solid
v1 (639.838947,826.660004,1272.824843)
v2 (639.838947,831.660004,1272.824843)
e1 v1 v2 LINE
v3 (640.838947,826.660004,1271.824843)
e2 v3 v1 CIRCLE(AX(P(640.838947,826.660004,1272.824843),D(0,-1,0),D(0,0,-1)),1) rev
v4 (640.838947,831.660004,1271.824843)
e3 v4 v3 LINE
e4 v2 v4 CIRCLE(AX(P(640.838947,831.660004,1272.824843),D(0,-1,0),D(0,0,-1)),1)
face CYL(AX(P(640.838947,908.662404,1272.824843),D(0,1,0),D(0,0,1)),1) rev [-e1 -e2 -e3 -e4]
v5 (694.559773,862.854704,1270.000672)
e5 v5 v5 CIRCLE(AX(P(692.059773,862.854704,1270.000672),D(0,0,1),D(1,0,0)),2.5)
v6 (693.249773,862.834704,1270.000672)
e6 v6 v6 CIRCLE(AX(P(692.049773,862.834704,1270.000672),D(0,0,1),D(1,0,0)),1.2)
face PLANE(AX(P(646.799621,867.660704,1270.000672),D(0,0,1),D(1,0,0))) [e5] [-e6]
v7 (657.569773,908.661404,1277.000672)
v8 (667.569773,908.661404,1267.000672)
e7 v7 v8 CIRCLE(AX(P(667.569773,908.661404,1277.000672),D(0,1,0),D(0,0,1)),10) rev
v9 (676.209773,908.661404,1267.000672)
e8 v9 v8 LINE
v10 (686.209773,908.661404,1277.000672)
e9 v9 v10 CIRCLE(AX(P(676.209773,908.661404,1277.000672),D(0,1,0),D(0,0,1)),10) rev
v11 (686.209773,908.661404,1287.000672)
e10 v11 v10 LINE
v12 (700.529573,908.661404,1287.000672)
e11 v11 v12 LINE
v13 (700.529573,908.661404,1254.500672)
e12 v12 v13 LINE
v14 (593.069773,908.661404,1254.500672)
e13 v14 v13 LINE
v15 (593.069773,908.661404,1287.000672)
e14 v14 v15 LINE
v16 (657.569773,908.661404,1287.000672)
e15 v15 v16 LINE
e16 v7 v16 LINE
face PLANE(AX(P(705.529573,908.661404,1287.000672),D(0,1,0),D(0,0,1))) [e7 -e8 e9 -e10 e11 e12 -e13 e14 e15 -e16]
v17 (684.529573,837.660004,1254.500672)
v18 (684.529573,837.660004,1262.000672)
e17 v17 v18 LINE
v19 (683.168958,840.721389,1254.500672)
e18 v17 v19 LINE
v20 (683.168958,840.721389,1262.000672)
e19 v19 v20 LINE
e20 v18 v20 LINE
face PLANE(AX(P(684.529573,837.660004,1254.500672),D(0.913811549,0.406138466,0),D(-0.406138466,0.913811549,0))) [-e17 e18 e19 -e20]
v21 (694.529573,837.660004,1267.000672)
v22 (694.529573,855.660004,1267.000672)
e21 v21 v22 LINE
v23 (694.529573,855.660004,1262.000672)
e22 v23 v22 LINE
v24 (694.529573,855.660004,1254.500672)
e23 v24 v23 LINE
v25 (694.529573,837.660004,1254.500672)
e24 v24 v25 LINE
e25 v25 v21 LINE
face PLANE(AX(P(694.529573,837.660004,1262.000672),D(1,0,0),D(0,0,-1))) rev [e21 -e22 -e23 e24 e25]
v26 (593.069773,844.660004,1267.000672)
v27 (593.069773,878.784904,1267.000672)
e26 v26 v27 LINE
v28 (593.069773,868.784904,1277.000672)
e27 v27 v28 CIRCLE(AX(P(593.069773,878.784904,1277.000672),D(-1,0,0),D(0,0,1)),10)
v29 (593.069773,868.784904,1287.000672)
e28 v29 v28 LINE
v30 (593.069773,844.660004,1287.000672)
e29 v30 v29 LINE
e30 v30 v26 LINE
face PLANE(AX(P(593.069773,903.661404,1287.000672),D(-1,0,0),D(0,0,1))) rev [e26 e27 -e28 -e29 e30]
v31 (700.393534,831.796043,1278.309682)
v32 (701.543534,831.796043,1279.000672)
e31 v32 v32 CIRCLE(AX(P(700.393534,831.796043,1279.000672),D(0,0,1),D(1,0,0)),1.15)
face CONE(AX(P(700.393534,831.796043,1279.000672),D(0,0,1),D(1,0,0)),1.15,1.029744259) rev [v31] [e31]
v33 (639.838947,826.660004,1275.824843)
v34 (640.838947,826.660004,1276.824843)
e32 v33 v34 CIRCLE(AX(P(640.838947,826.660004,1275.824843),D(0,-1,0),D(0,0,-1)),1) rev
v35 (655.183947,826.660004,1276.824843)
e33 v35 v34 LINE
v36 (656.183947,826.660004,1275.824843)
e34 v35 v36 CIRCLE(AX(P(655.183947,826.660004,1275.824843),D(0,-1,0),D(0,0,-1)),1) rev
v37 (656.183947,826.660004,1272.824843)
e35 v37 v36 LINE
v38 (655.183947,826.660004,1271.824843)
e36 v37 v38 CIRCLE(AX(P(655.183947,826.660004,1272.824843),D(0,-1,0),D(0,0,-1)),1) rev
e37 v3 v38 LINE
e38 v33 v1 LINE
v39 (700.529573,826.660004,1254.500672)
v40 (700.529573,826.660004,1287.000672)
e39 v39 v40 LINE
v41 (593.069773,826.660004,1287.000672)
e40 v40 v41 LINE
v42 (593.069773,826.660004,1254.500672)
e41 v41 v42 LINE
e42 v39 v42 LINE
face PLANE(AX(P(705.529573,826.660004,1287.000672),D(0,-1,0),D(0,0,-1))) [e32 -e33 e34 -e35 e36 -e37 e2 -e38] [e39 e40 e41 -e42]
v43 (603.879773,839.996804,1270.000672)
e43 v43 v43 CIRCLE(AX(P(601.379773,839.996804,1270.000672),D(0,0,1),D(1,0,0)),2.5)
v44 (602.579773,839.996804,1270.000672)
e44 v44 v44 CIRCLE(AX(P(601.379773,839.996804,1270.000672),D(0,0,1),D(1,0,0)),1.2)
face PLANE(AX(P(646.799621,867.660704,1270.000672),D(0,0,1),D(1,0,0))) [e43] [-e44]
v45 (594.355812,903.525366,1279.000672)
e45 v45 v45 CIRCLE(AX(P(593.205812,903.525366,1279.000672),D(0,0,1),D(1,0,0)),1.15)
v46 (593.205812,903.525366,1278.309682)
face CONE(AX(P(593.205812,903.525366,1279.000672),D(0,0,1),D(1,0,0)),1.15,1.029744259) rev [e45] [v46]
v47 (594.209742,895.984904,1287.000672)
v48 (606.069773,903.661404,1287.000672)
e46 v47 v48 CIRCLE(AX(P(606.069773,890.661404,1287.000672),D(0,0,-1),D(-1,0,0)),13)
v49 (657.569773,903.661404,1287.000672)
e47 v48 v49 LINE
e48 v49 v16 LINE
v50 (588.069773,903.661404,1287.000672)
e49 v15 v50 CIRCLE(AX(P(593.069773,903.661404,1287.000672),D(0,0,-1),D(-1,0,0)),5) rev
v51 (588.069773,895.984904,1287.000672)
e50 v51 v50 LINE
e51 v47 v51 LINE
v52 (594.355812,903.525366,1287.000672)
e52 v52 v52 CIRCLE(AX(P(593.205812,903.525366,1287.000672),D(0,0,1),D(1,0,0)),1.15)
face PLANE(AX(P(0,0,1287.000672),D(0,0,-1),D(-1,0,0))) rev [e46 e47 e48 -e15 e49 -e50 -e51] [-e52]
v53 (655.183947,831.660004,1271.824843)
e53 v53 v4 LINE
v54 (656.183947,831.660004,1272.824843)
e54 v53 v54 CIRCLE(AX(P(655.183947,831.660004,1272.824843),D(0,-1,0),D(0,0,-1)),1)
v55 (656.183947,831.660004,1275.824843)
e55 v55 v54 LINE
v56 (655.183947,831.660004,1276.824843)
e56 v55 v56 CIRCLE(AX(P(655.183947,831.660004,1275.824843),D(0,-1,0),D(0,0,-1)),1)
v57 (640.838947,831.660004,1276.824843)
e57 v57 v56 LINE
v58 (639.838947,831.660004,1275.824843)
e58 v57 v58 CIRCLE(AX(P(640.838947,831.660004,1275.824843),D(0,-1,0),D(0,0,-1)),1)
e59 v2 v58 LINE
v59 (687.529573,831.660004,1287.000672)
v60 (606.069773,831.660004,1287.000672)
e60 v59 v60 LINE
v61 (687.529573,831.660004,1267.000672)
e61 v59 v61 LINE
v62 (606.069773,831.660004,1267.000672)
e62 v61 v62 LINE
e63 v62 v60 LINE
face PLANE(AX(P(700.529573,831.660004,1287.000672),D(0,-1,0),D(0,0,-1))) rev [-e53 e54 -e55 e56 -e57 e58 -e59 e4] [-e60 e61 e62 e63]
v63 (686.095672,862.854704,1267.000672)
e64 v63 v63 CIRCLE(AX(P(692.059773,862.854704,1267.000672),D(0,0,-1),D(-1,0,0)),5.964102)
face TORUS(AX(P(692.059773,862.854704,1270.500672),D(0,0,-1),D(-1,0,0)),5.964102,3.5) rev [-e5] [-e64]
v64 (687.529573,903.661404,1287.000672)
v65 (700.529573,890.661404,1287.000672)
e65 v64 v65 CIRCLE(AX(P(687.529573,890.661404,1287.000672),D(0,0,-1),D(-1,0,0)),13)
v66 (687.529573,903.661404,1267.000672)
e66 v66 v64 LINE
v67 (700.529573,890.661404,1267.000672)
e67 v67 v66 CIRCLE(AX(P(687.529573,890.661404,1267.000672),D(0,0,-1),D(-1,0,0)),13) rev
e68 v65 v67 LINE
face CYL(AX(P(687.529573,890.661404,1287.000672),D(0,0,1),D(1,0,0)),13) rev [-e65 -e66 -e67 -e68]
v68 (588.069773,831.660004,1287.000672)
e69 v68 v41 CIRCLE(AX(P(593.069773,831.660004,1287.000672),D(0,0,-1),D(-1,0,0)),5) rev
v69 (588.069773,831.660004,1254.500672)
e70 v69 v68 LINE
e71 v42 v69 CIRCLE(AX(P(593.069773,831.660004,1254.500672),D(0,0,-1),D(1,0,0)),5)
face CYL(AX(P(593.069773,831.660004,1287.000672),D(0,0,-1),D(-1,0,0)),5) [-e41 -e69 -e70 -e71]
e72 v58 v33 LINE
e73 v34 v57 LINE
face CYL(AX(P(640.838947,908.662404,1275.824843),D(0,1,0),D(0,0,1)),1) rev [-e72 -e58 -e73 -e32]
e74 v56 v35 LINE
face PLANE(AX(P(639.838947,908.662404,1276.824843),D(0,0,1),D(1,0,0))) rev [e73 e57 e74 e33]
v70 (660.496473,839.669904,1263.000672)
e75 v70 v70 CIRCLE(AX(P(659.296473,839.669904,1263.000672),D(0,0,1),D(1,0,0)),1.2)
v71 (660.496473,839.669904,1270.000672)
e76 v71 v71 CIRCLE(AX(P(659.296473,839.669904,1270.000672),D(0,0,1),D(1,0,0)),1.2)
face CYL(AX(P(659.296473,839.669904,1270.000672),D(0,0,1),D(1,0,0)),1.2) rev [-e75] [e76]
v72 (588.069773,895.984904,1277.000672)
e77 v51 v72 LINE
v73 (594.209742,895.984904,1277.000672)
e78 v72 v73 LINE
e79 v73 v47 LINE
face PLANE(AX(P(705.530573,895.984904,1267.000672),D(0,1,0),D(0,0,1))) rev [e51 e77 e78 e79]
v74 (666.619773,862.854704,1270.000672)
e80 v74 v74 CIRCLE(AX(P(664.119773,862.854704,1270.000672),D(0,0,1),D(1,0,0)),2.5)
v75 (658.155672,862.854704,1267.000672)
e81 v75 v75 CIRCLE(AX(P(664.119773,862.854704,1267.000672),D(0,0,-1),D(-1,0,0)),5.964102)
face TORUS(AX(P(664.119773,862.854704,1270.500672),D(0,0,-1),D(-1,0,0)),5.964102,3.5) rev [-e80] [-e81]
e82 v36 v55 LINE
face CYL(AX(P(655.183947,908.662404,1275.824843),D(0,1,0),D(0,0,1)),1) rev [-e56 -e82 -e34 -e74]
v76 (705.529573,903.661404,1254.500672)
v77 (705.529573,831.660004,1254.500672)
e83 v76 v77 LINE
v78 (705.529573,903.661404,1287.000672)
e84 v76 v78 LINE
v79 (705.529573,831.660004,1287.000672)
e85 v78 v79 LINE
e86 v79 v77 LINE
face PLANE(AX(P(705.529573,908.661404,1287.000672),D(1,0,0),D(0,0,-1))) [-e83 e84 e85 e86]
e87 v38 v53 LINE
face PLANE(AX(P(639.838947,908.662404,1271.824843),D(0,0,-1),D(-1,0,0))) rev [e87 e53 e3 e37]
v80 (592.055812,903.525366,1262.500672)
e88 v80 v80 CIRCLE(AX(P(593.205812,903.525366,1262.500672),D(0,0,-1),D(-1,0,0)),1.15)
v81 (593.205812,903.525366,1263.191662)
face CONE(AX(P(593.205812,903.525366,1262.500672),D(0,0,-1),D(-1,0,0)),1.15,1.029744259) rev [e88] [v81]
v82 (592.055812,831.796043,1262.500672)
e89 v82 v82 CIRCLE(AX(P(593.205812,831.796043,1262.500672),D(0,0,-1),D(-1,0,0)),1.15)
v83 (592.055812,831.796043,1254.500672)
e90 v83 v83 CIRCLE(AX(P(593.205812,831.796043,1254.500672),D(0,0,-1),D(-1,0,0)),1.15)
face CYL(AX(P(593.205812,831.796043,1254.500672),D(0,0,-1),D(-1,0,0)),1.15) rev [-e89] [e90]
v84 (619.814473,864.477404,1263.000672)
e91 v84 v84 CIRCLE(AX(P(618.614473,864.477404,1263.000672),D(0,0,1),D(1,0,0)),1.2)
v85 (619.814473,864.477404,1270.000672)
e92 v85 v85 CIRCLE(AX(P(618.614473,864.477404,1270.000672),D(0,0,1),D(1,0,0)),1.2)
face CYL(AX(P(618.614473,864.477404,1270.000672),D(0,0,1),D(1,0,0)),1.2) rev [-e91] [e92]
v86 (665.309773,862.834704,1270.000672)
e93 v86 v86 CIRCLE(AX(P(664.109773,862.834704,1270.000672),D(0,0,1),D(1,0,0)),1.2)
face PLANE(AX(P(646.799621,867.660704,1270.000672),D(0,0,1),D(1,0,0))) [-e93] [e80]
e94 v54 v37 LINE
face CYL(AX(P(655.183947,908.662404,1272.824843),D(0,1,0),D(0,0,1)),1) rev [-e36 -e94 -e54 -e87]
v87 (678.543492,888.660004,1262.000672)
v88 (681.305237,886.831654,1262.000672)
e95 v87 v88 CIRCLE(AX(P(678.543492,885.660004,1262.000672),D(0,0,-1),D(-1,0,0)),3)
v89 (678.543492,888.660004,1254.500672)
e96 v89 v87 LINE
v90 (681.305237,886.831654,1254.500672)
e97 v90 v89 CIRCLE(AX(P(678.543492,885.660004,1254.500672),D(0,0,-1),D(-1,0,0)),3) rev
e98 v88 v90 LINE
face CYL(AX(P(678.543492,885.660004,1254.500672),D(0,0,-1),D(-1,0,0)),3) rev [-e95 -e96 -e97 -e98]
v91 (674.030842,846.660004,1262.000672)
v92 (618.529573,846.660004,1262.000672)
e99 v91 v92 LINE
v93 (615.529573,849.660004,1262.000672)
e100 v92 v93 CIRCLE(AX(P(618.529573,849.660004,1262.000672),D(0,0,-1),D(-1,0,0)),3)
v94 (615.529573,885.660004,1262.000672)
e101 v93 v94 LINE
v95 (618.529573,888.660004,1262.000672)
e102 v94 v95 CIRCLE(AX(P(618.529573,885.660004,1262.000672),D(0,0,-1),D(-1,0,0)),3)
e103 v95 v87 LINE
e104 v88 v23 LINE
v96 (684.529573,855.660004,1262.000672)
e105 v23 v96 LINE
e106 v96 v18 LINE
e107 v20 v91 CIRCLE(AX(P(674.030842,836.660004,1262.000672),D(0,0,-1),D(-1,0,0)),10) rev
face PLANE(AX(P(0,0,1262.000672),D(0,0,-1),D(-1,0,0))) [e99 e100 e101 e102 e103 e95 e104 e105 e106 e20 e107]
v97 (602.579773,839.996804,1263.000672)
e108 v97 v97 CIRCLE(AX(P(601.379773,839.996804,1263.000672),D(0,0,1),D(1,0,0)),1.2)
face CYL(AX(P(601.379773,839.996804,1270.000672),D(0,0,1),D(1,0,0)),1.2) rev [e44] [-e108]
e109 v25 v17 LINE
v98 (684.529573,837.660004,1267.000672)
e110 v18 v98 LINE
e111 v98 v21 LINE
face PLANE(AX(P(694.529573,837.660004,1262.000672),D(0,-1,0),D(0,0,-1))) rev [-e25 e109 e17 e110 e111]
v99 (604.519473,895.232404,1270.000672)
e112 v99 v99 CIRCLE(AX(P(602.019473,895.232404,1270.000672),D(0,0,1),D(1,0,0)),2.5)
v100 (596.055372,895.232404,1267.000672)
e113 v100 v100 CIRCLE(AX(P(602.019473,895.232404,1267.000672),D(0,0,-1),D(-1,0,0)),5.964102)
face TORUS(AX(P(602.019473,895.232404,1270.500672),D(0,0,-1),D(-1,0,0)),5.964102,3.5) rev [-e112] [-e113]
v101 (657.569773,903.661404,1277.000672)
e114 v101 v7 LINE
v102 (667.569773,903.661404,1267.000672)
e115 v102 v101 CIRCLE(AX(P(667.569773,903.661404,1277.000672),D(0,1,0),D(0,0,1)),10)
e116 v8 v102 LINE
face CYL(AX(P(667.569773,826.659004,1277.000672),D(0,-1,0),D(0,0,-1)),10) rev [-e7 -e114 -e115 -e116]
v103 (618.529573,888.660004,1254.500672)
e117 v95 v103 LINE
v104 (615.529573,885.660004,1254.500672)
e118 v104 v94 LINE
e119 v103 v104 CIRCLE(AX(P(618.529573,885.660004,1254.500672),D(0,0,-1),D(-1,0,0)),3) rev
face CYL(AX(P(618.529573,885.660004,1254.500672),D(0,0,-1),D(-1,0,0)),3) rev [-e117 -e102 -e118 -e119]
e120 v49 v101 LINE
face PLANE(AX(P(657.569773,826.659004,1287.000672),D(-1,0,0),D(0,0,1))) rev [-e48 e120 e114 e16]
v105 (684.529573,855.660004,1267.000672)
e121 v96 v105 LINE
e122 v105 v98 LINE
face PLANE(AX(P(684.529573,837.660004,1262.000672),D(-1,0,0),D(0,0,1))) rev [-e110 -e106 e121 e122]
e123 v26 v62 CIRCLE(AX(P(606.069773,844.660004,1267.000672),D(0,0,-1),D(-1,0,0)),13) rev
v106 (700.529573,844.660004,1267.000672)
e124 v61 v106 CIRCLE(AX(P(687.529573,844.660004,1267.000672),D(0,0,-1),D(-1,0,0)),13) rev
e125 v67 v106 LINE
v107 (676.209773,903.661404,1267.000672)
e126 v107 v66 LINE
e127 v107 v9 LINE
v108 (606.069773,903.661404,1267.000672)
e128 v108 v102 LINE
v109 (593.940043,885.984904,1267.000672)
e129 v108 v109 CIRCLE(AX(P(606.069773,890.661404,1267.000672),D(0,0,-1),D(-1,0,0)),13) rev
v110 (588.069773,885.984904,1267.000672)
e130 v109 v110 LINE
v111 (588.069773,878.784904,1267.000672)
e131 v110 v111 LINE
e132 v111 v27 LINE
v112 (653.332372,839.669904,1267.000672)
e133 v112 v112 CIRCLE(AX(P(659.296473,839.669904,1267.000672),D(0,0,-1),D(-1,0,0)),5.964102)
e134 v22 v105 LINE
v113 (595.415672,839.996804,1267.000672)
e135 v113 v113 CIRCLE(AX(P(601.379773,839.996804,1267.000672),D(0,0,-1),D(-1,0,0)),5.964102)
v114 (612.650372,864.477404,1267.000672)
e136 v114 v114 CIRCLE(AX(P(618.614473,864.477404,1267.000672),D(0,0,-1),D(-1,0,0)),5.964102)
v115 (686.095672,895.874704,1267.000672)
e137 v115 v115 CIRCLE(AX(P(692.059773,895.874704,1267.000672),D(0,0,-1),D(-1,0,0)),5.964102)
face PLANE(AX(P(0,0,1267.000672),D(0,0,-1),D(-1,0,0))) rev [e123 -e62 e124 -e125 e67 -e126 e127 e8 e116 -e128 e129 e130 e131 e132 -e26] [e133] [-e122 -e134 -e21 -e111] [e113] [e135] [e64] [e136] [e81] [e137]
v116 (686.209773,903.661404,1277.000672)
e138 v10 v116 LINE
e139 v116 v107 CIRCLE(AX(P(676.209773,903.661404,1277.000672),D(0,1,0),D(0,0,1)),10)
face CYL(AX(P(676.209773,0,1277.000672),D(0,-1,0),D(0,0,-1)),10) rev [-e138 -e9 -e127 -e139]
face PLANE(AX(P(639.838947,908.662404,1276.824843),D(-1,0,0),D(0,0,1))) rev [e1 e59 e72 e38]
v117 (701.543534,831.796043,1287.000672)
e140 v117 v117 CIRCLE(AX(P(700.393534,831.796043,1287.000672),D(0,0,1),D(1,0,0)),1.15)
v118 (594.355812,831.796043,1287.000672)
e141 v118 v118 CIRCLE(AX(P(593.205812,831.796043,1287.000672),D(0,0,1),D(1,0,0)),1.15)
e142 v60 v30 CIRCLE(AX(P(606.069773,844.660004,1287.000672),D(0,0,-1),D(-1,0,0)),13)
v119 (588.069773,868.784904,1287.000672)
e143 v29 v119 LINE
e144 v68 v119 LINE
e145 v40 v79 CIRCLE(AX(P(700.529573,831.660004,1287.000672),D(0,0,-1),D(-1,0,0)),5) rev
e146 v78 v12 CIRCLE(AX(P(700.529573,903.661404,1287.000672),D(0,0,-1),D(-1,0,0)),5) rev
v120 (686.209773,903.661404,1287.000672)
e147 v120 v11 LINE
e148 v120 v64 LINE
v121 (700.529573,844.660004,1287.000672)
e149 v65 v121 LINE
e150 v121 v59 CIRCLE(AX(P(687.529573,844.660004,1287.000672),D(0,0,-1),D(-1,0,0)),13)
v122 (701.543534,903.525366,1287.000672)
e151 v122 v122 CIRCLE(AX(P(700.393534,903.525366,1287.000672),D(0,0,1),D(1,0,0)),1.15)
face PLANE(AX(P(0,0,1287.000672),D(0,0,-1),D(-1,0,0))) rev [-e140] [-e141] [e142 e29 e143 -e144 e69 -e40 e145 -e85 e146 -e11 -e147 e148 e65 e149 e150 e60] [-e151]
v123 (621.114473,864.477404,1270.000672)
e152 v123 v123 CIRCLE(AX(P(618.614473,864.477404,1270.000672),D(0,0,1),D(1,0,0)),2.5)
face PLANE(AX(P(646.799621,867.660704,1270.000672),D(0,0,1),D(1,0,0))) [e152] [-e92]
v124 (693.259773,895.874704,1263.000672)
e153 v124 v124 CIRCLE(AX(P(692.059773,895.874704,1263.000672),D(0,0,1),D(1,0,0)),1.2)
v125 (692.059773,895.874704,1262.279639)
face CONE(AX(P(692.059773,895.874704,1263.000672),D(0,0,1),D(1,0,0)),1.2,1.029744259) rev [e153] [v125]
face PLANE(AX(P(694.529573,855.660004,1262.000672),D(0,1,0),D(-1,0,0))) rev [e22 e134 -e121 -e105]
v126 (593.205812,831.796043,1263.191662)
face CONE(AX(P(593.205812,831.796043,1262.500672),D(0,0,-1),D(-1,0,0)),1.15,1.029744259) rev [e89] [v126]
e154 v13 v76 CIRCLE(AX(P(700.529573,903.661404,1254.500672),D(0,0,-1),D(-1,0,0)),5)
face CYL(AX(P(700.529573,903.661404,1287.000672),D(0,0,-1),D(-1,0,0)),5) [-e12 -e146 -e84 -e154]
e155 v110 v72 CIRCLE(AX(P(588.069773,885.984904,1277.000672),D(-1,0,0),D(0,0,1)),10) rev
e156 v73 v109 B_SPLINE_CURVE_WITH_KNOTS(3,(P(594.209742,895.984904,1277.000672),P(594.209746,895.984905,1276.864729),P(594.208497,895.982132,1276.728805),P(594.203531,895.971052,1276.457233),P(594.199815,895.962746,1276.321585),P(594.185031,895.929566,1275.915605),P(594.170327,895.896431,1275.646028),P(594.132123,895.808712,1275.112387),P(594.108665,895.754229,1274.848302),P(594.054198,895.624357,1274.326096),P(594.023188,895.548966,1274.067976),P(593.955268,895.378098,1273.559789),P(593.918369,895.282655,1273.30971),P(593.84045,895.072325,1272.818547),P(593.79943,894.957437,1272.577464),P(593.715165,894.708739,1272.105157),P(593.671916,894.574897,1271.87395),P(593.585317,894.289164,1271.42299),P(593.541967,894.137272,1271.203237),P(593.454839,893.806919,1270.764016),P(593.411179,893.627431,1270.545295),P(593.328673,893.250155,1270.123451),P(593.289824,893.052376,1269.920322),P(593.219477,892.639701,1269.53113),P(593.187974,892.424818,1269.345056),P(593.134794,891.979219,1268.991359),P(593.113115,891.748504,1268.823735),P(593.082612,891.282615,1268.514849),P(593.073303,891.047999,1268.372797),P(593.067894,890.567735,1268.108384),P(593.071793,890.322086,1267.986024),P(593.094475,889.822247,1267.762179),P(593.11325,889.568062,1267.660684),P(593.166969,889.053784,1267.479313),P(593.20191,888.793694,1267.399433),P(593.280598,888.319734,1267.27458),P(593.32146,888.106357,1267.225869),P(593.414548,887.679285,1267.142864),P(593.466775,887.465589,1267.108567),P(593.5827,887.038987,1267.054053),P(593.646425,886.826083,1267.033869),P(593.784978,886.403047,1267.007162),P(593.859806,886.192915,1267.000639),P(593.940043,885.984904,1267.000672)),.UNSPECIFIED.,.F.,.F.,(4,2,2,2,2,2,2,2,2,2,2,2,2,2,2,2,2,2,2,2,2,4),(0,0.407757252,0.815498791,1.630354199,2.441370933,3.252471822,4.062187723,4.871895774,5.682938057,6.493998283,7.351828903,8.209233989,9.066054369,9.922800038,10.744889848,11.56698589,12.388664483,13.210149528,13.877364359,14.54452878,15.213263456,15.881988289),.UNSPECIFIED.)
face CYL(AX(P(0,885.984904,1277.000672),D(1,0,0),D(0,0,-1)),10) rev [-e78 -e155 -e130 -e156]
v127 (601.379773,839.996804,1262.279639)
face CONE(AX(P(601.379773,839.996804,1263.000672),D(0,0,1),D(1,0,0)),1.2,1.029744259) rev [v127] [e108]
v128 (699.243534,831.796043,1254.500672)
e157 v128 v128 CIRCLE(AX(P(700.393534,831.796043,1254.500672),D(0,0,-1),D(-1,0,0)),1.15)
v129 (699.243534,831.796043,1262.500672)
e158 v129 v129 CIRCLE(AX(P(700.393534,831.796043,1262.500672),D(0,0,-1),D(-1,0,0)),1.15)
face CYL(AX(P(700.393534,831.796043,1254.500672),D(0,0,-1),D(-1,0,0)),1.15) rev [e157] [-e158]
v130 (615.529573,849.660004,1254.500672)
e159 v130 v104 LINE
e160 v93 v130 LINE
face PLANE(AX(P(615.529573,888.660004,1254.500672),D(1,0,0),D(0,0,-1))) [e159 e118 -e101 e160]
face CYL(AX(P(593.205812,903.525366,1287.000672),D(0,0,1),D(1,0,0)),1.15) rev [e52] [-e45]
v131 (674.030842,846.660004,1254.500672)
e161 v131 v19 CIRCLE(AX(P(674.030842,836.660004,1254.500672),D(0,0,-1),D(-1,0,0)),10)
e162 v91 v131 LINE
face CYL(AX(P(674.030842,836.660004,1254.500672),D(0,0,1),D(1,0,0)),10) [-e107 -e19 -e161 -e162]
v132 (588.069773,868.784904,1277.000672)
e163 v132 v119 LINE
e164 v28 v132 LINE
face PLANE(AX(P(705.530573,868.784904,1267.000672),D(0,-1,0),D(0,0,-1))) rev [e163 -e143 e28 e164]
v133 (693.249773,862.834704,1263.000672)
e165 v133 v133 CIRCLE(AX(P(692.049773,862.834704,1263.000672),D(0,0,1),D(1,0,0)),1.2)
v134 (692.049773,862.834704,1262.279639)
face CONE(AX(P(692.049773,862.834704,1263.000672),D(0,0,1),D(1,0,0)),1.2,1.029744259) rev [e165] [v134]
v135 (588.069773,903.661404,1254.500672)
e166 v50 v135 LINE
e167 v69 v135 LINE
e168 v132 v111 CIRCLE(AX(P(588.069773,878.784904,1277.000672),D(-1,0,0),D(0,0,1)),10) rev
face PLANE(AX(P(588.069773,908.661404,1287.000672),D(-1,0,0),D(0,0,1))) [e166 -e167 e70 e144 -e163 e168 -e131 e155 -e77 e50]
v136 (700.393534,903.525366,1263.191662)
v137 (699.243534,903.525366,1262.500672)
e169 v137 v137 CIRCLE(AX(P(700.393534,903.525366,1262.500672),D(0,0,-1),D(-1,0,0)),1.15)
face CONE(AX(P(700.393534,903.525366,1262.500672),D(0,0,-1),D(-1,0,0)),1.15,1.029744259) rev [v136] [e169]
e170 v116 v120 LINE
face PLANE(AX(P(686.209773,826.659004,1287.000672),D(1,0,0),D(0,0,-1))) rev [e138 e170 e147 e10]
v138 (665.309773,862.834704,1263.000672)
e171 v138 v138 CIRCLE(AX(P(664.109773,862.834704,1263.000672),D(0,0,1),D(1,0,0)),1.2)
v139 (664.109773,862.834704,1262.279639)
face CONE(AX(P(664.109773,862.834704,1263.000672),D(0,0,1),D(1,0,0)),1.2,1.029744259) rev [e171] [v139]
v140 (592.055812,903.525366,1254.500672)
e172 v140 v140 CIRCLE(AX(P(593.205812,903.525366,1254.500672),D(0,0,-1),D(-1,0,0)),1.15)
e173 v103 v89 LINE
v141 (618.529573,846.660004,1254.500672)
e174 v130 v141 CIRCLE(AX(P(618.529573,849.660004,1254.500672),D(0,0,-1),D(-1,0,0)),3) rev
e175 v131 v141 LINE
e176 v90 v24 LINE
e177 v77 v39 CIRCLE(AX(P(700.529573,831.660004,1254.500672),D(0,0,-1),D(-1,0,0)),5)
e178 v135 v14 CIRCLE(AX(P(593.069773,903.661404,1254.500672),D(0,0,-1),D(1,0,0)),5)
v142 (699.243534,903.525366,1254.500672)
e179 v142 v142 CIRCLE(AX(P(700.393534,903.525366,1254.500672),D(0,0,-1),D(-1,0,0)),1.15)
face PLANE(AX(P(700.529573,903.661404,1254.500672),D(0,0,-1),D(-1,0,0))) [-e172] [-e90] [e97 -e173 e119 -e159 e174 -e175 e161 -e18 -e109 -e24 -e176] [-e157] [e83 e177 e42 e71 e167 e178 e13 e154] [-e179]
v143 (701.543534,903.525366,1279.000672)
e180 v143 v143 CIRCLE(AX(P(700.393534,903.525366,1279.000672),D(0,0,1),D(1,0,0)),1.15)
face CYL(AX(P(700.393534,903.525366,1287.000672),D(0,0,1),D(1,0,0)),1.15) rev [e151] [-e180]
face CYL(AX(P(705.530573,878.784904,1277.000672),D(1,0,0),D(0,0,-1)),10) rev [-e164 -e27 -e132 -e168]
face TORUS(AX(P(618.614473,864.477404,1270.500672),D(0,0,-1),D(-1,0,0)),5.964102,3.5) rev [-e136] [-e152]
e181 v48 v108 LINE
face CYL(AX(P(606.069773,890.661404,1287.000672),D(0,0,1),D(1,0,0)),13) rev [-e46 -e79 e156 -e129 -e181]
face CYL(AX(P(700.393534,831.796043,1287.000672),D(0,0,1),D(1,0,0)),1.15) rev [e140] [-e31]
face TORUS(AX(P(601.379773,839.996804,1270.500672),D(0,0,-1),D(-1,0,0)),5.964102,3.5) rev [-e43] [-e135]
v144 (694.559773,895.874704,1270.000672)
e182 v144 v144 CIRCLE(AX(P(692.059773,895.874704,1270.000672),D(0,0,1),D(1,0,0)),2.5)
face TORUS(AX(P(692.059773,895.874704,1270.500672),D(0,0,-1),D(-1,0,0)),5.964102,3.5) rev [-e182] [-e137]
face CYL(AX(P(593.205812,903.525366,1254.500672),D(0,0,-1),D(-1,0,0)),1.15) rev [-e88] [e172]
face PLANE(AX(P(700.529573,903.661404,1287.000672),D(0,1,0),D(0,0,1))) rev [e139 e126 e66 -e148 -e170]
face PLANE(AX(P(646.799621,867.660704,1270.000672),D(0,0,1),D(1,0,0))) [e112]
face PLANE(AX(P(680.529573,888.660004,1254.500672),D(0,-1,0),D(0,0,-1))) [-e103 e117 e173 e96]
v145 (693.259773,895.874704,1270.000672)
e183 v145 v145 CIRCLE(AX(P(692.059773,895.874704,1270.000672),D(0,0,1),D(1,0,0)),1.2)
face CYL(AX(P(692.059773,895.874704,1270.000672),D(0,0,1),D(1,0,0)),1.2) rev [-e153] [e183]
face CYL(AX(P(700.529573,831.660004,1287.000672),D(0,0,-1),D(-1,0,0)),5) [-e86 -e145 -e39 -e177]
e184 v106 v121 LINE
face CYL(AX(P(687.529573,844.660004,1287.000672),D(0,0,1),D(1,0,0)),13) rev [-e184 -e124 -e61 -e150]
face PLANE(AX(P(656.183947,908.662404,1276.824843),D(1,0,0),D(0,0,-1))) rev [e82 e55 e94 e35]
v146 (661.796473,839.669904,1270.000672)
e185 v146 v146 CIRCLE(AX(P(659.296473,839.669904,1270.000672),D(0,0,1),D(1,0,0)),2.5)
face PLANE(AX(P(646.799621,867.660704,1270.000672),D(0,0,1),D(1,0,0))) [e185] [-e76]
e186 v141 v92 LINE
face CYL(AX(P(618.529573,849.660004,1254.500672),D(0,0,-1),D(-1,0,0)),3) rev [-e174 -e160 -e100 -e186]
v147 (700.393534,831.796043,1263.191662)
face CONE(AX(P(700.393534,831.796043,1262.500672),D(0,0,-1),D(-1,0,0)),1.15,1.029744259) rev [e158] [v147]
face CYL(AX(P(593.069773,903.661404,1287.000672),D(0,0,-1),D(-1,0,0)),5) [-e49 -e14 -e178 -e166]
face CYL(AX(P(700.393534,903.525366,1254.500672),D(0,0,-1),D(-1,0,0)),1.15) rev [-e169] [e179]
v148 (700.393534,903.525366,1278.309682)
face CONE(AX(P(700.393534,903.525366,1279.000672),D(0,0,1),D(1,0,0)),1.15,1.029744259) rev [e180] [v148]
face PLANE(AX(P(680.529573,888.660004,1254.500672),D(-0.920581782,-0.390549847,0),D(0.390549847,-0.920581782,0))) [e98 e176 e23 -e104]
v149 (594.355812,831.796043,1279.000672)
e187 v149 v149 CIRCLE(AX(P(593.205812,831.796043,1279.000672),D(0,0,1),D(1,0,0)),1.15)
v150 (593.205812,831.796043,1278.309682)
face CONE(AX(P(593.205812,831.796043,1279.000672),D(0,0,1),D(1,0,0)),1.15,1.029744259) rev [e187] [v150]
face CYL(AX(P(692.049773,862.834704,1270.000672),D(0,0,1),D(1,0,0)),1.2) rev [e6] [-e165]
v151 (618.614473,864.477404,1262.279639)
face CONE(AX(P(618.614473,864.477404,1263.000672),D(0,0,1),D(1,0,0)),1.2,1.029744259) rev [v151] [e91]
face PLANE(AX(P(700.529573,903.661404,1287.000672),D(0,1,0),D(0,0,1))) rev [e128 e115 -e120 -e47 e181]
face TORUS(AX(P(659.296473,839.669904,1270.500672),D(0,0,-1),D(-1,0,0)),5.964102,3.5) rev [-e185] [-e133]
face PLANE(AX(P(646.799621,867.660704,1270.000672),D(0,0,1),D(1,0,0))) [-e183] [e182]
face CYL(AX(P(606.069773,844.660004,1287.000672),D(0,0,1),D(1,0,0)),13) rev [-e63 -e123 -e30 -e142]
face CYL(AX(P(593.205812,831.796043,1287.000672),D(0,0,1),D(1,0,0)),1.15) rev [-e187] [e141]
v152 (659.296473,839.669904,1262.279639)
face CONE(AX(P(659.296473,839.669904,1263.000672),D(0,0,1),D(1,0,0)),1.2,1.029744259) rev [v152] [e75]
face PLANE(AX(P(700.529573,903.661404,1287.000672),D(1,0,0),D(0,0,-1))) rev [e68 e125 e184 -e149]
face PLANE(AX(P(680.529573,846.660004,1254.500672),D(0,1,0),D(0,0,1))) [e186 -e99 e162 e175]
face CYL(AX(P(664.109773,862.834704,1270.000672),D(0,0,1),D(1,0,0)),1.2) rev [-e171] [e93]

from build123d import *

# Parameters (mm, degrees)
SKETCH1_W                       = 107.4598
SKETCH1_H                       = 72.0014
BOSS_EXTRUDE1_DEPTH             = 5
SKETCH2_R                       = 2.5
BOSS_EXTRUDE2_DEPTH             = 3
FILLET1_R                       = 3.5
SKETCH3_W                       = 10
SKETCH3_H                       = 18
CUT_EXTRUDE1_DEPTH              = 1144.403085918
SKETCH4_W                       = 117.4598
SKETCH4_H                       = 82.0014
SKETCH4_W_2                     = 107.4598
SKETCH4_H_2                     = 72.0014
BOSS_EXTRUDE3_DEPTH             = 25
FILLET2_R                       = 13
FILLET4_R                       = 5
CUT_EXTRUDE2_REACH              = 1581.821
SKETCH5_W                       = 20
SKETCH5_H                       = 27.2
CUT_EXTRUDE3_REACH              = 1471.989
SKETCH6_W                       = 28.64
SKETCH6_H                       = 20
CUT_EXTRUDE4_REACH              = 1471.989
SKETCH7_W                       = 16.345
SKETCH7_H                       = 5
FILLET6_R                       = 10
BOSS_EXTRUDE4_DEPTH             = 7.5
M2_5_CLEARANCE_HOLE1_AT_2_COUNT = 2
M2_5_CLEARANCE_HOLE1_AT_2_PITCH = 128.97404159
M2_5_CLEARANCE_HOLE1_AT_3_COUNT = 2
M2_5_CLEARANCE_HOLE1_AT_3_PITCH = 71.729322061
M2_5_CLEARANCE_HOLE1_AT_4_COUNT = 2
M2_5_CLEARANCE_HOLE1_AT_4_PITCH = 107.187722061
FILLET7_R                       = 10
FILLET9_R                       = 3
FILLET10_R                      = 1
M2_5_CLEARANCE_HOLE2_D          = 2.4
M2_5_CLEARANCE_HOLE2_DEPTH      = 7
M2_5_CLEARANCE_HOLE2_TIP        = 0.721032743


with BuildPart() as part:
    # Sketch1 → Boss-Extrude1 (new body)
    with BuildSketch(Plane(origin=(0, 0, 1267.000672028), x_dir=(-1, 0, 0), z_dir=(0, 0, -1))):
        with Locations((-646.799673216, 867.660704475)):
            Rectangle(SKETCH1_W, SKETCH1_H)
    extrude(amount=BOSS_EXTRUDE1_DEPTH)

    # Sketch2 → Boss-Extrude2 (add)
    with BuildSketch(Plane.XY.offset(1267.000672028)):
        with Locations(Location((692.059773216, 895.874704475, 0), (0, 0, 180))):
            Circle(SKETCH2_R)
        with Locations(Location((601.379773216, 839.996804475, 0), (0, 0, 180))):
            Circle(SKETCH2_R)
        with Locations(Location((692.059773216, 862.854704475, 0), (0, 0, 180))):
            Circle(SKETCH2_R)
        with Locations(Location((664.119773216, 862.854704475, 0), (0, 0, 180))):
            Circle(SKETCH2_R)
        with Locations(Location((602.019473216, 895.232404475, 0), (0, 0, 180))):
            Circle(SKETCH2_R)
        with Locations(Location((618.614473216, 864.477404475, 0), (0, 0, 180))):
            Circle(SKETCH2_R)
        with Locations(Location((659.296473216, 839.669904475, 0), (0, 0, 180))):
            Circle(SKETCH2_R)
    extrude(amount=BOSS_EXTRUDE2_DEPTH)

    # Fillet1
    # the kernel refuses this fillet: 3.5 mm, written as the material it adds along each edge
    with BuildSketch(Plane(origin=(692.059773216, 895.874704475, 1267.000672028), x_dir=(-1, 0, 0), z_dir=(0, 1, 0))) as fillet1_piece_1:
        with BuildLine():
            CenterArc((5.964101615, 3.5), FILLET1_R, 188.213210702, 81.786789298)
            Line((2.5, 3), (2.430717968, 2.99))
            ThreePointArc((2.430717968, 2.99), (2.43, 1.5), (2.43, 0))
            Line((2.43, 0), (2.5, -0.07))
            Line((2.5, -0.07), (5.964101615, -0.07))
            Line((5.964101615, -0.07), (5.964101615, 0))
        make_face()
    revolve(axis=Axis((692.059773216, 895.874704475, 1267.000672028), (0, 0, 1)))
    with BuildSketch(Plane(origin=(659.296473216, 839.669904475, 1267.000672028), x_dir=(-1, 0, 0), z_dir=(0, 1, 0))) as fillet1_piece_2:
        with BuildLine():
            CenterArc((5.964101615, 3.5), FILLET1_R, 188.213210702, 81.786789298)
            Line((2.5, 3), (2.430717968, 2.99))
            ThreePointArc((2.430717968, 2.99), (2.43, 1.5), (2.43, 0))
            Line((2.43, 0), (2.5, -0.07))
            Line((2.5, -0.07), (5.964101615, -0.07))
            Line((5.964101615, -0.07), (5.964101615, 0))
        make_face()
    revolve(axis=Axis((659.296473216, 839.669904475, 1267.000672028), (0, 0, 1)))
    with BuildSketch(Plane(origin=(618.614473216, 864.477404475, 1267.000672028), x_dir=(-1, 0, 0), z_dir=(0, 1, 0))) as fillet1_piece_3:
        with BuildLine():
            CenterArc((5.964101615, 3.5), FILLET1_R, 188.213210702, 81.786789298)
            Line((2.5, 3), (2.430717968, 2.99))
            ThreePointArc((2.430717968, 2.99), (2.43, 1.5), (2.43, 0))
            Line((2.43, 0), (2.5, -0.07))
            Line((2.5, -0.07), (5.964101615, -0.07))
            Line((5.964101615, -0.07), (5.964101615, 0))
        make_face()
    revolve(axis=Axis((618.614473216, 864.477404475, 1267.000672028), (0, 0, 1)))
    with BuildSketch(Plane(origin=(601.379773216, 839.996804475, 1267.000672028), x_dir=(-1, 0, 0), z_dir=(0, 1, 0))) as fillet1_piece_4:
        with BuildLine():
            CenterArc((5.964101615, 3.5), FILLET1_R, 188.213210702, 81.786789298)
            Line((2.5, 3), (2.430717968, 2.99))
            ThreePointArc((2.430717968, 2.99), (2.43, 1.5), (2.43, 0))
            Line((2.43, 0), (2.5, -0.07))
            Line((2.5, -0.07), (5.964101615, -0.07))
            Line((5.964101615, -0.07), (5.964101615, 0))
        make_face()
    revolve(axis=Axis((601.379773216, 839.996804475, 1267.000672028), (0, 0, 1)))
    with BuildSketch(Plane(origin=(692.059773216, 862.854704475, 1267.000672028), x_dir=(-1, 0, 0), z_dir=(0, 1, 0))) as fillet1_piece_5:
        with BuildLine():
            CenterArc((5.964101615, 3.5), FILLET1_R, 188.213210702, 81.786789298)
            Line((2.5, 3), (2.430717968, 2.99))
            ThreePointArc((2.430717968, 2.99), (2.43, 1.5), (2.43, 0))
            Line((2.43, 0), (2.5, -0.07))
            Line((2.5, -0.07), (5.964101615, -0.07))
            Line((5.964101615, -0.07), (5.964101615, 0))
        make_face()
    revolve(axis=Axis((692.059773216, 862.854704475, 1267.000672028), (0, 0, 1)))
    with BuildSketch(Plane(origin=(664.119773216, 862.854704475, 1267.000672028), x_dir=(-1, 0, 0), z_dir=(0, 1, 0))) as fillet1_piece_6:
        with BuildLine():
            CenterArc((5.964101615, 3.5), FILLET1_R, 188.213210702, 81.786789298)
            Line((2.5, 3), (2.430717968, 2.99))
            ThreePointArc((2.430717968, 2.99), (2.43, 1.5), (2.43, 0))
            Line((2.43, 0), (2.5, -0.07))
            Line((2.5, -0.07), (5.964101615, -0.07))
            Line((5.964101615, -0.07), (5.964101615, 0))
        make_face()
    revolve(axis=Axis((664.119773216, 862.854704475, 1267.000672028), (0, 0, 1)))
    with BuildSketch(Plane(origin=(602.019473216, 895.232404475, 1267.000672028), x_dir=(-1, 0, 0), z_dir=(0, 1, 0))) as fillet1_piece_7:
        with BuildLine():
            CenterArc((5.964101615, 3.5), FILLET1_R, 188.213210702, 81.786789298)
            Line((2.5, 3), (2.430717968, 2.99))
            ThreePointArc((2.430717968, 2.99), (2.43, 1.5), (2.43, 0))
            Line((2.43, 0), (2.5, -0.07))
            Line((2.5, -0.07), (5.964101615, -0.07))
            Line((5.964101615, -0.07), (5.964101615, 0))
        make_face()
    revolve(axis=Axis((602.019473216, 895.232404475, 1267.000672028), (0, 0, 1)))

    # Sketch3 → Cut-Extrude1 (cut, through all)
    with BuildSketch(Plane.XY.offset(1267.000672028)):
        with Locations((689.529573216, 846.660004475)):
            Rectangle(SKETCH3_W, SKETCH3_H)
    extrude(amount=-CUT_EXTRUDE1_DEPTH, mode=Mode.SUBTRACT)

    # Sketch4 → Boss-Extrude3 (add)
    with BuildSketch(Plane(origin=(0, 0, 1262.000672028), x_dir=(-1, 0, 0), z_dir=(0, 0, -1))):
        with Locations((-646.799673216, 867.660704475)):
            Rectangle(SKETCH4_W, SKETCH4_H)
        with Locations((-646.799673216, 867.660704475)):
            Rectangle(SKETCH4_W_2, SKETCH4_H_2, mode=Mode.SUBTRACT)
    extrude(amount=-BOSS_EXTRUDE3_DEPTH)

    # Fillet2
    fillet2_edges = [part.edges().sort_by_distance(p)[0] for p in [
        (700.529573216, 903.661404475, 1277.000672028),
        (593.069773216, 903.661404475, 1277.000672028),
        (593.069773216, 831.660004475, 1277.000672028),
        (700.529573216, 831.660004475, 1277.000672028),
    ]]
    fillet(fillet2_edges, radius=FILLET2_R)

    # Fillet4
    fillet4_edges = [part.edges().sort_by_distance(p)[0] for p in [
        (705.529573216, 826.660004475, 1274.500672028),
        (705.529573216, 908.661404475, 1274.500672028),
        (588.069773216, 908.661404475, 1274.500672028),
        (588.069773216, 826.660004475, 1274.500672028),
    ]]
    fillet(fillet4_edges, radius=FILLET4_R)

    # Sketch5 → Cut-Extrude2 (cut, up to next)
    with BuildSketch(Plane.ZY.offset(-588.069773216), mode=Mode.PRIVATE) as cut_extrude2_sk1:
        with Locations((1277.000672028, 882.384904475)):
            Rectangle(SKETCH5_W, SKETCH5_H)
    cut_extrude2_tool1 = extrude(cut_extrude2_sk1.sketch, amount=-CUT_EXTRUDE2_REACH, mode=Mode.PRIVATE) & part.part
    add(cut_extrude2_tool1.solids().sort_by_distance((588.069773, 882.384904, 1277.000672))[0], mode=Mode.SUBTRACT)

    # Sketch6 → Cut-Extrude3 (cut, up to next)
    with BuildSketch(Plane(origin=(0, 908.661404475, 0), x_dir=(1, 0, 0), z_dir=(0, 1, 0)), mode=Mode.PRIVATE) as cut_extrude3_sk1:
        with Locations((671.889773216, -1277.000672028)):
            Rectangle(SKETCH6_W, SKETCH6_H)
    cut_extrude3_tool1 = extrude(cut_extrude3_sk1.sketch, amount=-CUT_EXTRUDE3_REACH, mode=Mode.PRIVATE) & part.part
    add(cut_extrude3_tool1.solids().sort_by_distance((671.889773, 908.661404, 1277.000672))[0], mode=Mode.SUBTRACT)

    # Sketch7 → Cut-Extrude4 (cut, up to next)
    with BuildSketch(Plane.XZ.offset(-826.660004475), mode=Mode.PRIVATE) as cut_extrude4_sk1:
        with Locations((648.011447044, 1274.324843002)):
            Rectangle(SKETCH7_W, SKETCH7_H)
    cut_extrude4_tool1 = extrude(cut_extrude4_sk1.sketch, amount=-CUT_EXTRUDE4_REACH, mode=Mode.PRIVATE) & part.part
    add(cut_extrude4_tool1.solids().sort_by_distance((648.011447, 826.660004, 1274.324843))[0], mode=Mode.SUBTRACT)

    # Fillet6
    fillet6_edges = [part.edges().sort_by_distance(p)[0] for p in [
        (591.139757454, 895.984904475, 1267.000672028),
        (590.569773216, 868.784904475, 1267.000672028),
        (686.209773216, 906.161404475, 1267.000672028),
        (657.569773216, 906.161404475, 1267.000672028),
    ]]
    fillet(fillet6_edges, radius=FILLET6_R)

    # Sketch8 → Boss-Extrude4 (add)
    with BuildSketch(Plane(origin=(0, 0, 1262.000672028), x_dir=(-1, 0, 0), z_dir=(0, 0, -1))):
        with BuildLine():
            Line((-705.529573216, 903.661404475), (-705.529573216, 831.660004475))
            ThreePointArc((-705.529573216, 831.660004475), (-704.065107121, 828.124470569), (-700.529573216, 826.660004475))
            Line((-700.529573216, 826.660004475), (-593.069773216, 826.660004475))
            ThreePointArc((-593.069773216, 826.660004475), (-589.53423931, 828.124470569), (-588.069773216, 831.660004475))
            Line((-588.069773216, 831.660004475), (-588.069773216, 903.661404475))
            ThreePointArc((-588.069773216, 903.661404475), (-589.53423931, 907.19693838), (-593.069773216, 908.661404475))
            Line((-593.069773216, 908.661404475), (-700.529573216, 908.661404475))
            ThreePointArc((-700.529573216, 908.661404475), (-704.065107121, 907.19693838), (-705.529573216, 903.661404475))
        make_face()
        Polygon((-680.529573216, 888.660004475), (-694.529573216, 855.660004475), (-694.529573216, 837.660004475), (-684.529573216, 837.660004475), (-680.529573216, 846.660004475), (-615.529573216, 846.660004475), (-615.529573216, 888.660004475), align=None, mode=Mode.SUBTRACT)
    extrude(amount=BOSS_EXTRUDE4_DEPTH)

    # Sketch11 → M2.5 Clearance Hole1 (revolve, cut)
    with BuildSketch(Plane(origin=(700.393534246, 831.796043444, 1287.000672028), x_dir=(0, -1, 0), z_dir=(1, 0, 0))):
        Polygon((0, 0), (0, 8.690989712), (1.15, 8), (1.15, 0), align=None)
    m2_5_clearance_hole1 = revolve(axis=Axis((700.393534246, 831.796043444, 1293.350672028), (0, 0, -1)), mode=Mode.SUBTRACT)

    # M2.5 Clearance Hole1 at 2: M2.5 Clearance Hole1 ×2
    with Locations(*[Vector(-0.8310798106336571, 0.5561531698706076, 0) * (i * M2_5_CLEARANCE_HOLE1_AT_2_PITCH) for i in range(1, M2_5_CLEARANCE_HOLE1_AT_2_COUNT)]):
        add(m2_5_clearance_hole1, mode=Mode.SUBTRACT)

    # M2.5 Clearance Hole1 at 3: M2.5 Clearance Hole1 ×2
    with Locations(*[(0, i * M2_5_CLEARANCE_HOLE1_AT_3_PITCH, 0) for i in range(1, M2_5_CLEARANCE_HOLE1_AT_3_COUNT)]):
        add(m2_5_clearance_hole1, mode=Mode.SUBTRACT)

    # M2.5 Clearance Hole1 at 4: M2.5 Clearance Hole1 ×2
    with Locations(*[(-i * M2_5_CLEARANCE_HOLE1_AT_4_PITCH, 0, 0) for i in range(1, M2_5_CLEARANCE_HOLE1_AT_4_COUNT)]):
        add(m2_5_clearance_hole1, mode=Mode.SUBTRACT)

    # Mirror1: M2.5 Clearance Hole1 across plane
    add(m2_5_clearance_hole1.mirror(Plane.XY.offset(1270.750672028)), mode=Mode.SUBTRACT)

    # Mirror1 copy 1 sketch → Mirror1 copy 1 (revolve, cut)
    with BuildSketch(Plane(origin=(593.205812185, 903.525365505, 1254.500672028), x_dir=(0, -1, 0), z_dir=(1, 0, 0))):
        Polygon((0, 0), (0, -8.690989712), (1.15, -8), (1.15, 0), align=None)
    revolve(axis=Axis((593.205812185, 903.525365505, 1248.150672028), (0, 0, -1)), mode=Mode.SUBTRACT)

    # Mirror1 copy 2 sketch → Mirror1 copy 2 (revolve, cut)
    with BuildSketch(Plane(origin=(700.393534246, 903.525365505, 1254.500672028), x_dir=(0, -1, 0), z_dir=(1, 0, 0))):
        Polygon((0, 0), (0, -8.690989712), (1.15, -8), (1.15, 0), align=None)
    revolve(axis=Axis((700.393534246, 903.525365505, 1248.150672028), (0, 0, -1)), mode=Mode.SUBTRACT)

    # Mirror1 copy 3 sketch → Mirror1 copy 3 (revolve, cut)
    with BuildSketch(Plane(origin=(593.205812185, 831.796043444, 1254.500672028), x_dir=(0, -1, 0), z_dir=(1, 0, 0))):
        Polygon((0, 0), (0, -8.690989712), (1.15, -8), (1.15, 0), align=None)
    revolve(axis=Axis((593.205812185, 831.796043444, 1248.150672028), (0, 0, -1)), mode=Mode.SUBTRACT)

    # Fillet7
    fillet7_edges = [part.edges().sort_by_distance(p)[0] for p in [
        (680.529573216, 846.660004475, 1258.250672028),
    ]]
    fillet(fillet7_edges, radius=FILLET7_R)

    # Fillet9
    fillet9_edges = [part.edges().sort_by_distance(p)[0] for p in [
        (680.529573216, 888.660004475, 1258.250672028),
        (615.529573216, 846.660004475, 1258.250672028),
        (615.529573216, 888.660004475, 1258.250672028),
    ]]
    fillet(fillet9_edges, radius=FILLET9_R)

    # Fillet10
    fillet10_edges = [part.edges().sort_by_distance(p)[0] for p in [
        (639.838947044, 829.160004475, 1271.824843002),
        (639.838947044, 829.160004475, 1276.824843002),
        (656.183947044, 829.160004475, 1276.824843002),
        (656.183947044, 829.160004475, 1271.824843002),
    ]]
    fillet(fillet10_edges, radius=FILLET10_R)

    # M2.5 Clearance Hole2
    with Locations(Plane.XY.offset(1270.000672028)):
        with Locations((601.379773216, 839.996804475), (659.296473216, 839.669904475), (692.049773216, 862.834704475), (664.109773216, 862.834704475), (692.059773216, 895.874704475), (618.614473216, 864.477404475)):
            Hole(M2_5_CLEARANCE_HOLE2_D / 2, depth=M2_5_CLEARANCE_HOLE2_DEPTH)
            with Locations((0, 0, -(M2_5_CLEARANCE_HOLE2_DEPTH + M2_5_CLEARANCE_HOLE2_TIP / 2))):  # 118° drill point
                Cone(0, M2_5_CLEARANCE_HOLE2_D / 2, M2_5_CLEARANCE_HOLE2_TIP, mode=Mode.SUBTRACT)


solid = part.part
